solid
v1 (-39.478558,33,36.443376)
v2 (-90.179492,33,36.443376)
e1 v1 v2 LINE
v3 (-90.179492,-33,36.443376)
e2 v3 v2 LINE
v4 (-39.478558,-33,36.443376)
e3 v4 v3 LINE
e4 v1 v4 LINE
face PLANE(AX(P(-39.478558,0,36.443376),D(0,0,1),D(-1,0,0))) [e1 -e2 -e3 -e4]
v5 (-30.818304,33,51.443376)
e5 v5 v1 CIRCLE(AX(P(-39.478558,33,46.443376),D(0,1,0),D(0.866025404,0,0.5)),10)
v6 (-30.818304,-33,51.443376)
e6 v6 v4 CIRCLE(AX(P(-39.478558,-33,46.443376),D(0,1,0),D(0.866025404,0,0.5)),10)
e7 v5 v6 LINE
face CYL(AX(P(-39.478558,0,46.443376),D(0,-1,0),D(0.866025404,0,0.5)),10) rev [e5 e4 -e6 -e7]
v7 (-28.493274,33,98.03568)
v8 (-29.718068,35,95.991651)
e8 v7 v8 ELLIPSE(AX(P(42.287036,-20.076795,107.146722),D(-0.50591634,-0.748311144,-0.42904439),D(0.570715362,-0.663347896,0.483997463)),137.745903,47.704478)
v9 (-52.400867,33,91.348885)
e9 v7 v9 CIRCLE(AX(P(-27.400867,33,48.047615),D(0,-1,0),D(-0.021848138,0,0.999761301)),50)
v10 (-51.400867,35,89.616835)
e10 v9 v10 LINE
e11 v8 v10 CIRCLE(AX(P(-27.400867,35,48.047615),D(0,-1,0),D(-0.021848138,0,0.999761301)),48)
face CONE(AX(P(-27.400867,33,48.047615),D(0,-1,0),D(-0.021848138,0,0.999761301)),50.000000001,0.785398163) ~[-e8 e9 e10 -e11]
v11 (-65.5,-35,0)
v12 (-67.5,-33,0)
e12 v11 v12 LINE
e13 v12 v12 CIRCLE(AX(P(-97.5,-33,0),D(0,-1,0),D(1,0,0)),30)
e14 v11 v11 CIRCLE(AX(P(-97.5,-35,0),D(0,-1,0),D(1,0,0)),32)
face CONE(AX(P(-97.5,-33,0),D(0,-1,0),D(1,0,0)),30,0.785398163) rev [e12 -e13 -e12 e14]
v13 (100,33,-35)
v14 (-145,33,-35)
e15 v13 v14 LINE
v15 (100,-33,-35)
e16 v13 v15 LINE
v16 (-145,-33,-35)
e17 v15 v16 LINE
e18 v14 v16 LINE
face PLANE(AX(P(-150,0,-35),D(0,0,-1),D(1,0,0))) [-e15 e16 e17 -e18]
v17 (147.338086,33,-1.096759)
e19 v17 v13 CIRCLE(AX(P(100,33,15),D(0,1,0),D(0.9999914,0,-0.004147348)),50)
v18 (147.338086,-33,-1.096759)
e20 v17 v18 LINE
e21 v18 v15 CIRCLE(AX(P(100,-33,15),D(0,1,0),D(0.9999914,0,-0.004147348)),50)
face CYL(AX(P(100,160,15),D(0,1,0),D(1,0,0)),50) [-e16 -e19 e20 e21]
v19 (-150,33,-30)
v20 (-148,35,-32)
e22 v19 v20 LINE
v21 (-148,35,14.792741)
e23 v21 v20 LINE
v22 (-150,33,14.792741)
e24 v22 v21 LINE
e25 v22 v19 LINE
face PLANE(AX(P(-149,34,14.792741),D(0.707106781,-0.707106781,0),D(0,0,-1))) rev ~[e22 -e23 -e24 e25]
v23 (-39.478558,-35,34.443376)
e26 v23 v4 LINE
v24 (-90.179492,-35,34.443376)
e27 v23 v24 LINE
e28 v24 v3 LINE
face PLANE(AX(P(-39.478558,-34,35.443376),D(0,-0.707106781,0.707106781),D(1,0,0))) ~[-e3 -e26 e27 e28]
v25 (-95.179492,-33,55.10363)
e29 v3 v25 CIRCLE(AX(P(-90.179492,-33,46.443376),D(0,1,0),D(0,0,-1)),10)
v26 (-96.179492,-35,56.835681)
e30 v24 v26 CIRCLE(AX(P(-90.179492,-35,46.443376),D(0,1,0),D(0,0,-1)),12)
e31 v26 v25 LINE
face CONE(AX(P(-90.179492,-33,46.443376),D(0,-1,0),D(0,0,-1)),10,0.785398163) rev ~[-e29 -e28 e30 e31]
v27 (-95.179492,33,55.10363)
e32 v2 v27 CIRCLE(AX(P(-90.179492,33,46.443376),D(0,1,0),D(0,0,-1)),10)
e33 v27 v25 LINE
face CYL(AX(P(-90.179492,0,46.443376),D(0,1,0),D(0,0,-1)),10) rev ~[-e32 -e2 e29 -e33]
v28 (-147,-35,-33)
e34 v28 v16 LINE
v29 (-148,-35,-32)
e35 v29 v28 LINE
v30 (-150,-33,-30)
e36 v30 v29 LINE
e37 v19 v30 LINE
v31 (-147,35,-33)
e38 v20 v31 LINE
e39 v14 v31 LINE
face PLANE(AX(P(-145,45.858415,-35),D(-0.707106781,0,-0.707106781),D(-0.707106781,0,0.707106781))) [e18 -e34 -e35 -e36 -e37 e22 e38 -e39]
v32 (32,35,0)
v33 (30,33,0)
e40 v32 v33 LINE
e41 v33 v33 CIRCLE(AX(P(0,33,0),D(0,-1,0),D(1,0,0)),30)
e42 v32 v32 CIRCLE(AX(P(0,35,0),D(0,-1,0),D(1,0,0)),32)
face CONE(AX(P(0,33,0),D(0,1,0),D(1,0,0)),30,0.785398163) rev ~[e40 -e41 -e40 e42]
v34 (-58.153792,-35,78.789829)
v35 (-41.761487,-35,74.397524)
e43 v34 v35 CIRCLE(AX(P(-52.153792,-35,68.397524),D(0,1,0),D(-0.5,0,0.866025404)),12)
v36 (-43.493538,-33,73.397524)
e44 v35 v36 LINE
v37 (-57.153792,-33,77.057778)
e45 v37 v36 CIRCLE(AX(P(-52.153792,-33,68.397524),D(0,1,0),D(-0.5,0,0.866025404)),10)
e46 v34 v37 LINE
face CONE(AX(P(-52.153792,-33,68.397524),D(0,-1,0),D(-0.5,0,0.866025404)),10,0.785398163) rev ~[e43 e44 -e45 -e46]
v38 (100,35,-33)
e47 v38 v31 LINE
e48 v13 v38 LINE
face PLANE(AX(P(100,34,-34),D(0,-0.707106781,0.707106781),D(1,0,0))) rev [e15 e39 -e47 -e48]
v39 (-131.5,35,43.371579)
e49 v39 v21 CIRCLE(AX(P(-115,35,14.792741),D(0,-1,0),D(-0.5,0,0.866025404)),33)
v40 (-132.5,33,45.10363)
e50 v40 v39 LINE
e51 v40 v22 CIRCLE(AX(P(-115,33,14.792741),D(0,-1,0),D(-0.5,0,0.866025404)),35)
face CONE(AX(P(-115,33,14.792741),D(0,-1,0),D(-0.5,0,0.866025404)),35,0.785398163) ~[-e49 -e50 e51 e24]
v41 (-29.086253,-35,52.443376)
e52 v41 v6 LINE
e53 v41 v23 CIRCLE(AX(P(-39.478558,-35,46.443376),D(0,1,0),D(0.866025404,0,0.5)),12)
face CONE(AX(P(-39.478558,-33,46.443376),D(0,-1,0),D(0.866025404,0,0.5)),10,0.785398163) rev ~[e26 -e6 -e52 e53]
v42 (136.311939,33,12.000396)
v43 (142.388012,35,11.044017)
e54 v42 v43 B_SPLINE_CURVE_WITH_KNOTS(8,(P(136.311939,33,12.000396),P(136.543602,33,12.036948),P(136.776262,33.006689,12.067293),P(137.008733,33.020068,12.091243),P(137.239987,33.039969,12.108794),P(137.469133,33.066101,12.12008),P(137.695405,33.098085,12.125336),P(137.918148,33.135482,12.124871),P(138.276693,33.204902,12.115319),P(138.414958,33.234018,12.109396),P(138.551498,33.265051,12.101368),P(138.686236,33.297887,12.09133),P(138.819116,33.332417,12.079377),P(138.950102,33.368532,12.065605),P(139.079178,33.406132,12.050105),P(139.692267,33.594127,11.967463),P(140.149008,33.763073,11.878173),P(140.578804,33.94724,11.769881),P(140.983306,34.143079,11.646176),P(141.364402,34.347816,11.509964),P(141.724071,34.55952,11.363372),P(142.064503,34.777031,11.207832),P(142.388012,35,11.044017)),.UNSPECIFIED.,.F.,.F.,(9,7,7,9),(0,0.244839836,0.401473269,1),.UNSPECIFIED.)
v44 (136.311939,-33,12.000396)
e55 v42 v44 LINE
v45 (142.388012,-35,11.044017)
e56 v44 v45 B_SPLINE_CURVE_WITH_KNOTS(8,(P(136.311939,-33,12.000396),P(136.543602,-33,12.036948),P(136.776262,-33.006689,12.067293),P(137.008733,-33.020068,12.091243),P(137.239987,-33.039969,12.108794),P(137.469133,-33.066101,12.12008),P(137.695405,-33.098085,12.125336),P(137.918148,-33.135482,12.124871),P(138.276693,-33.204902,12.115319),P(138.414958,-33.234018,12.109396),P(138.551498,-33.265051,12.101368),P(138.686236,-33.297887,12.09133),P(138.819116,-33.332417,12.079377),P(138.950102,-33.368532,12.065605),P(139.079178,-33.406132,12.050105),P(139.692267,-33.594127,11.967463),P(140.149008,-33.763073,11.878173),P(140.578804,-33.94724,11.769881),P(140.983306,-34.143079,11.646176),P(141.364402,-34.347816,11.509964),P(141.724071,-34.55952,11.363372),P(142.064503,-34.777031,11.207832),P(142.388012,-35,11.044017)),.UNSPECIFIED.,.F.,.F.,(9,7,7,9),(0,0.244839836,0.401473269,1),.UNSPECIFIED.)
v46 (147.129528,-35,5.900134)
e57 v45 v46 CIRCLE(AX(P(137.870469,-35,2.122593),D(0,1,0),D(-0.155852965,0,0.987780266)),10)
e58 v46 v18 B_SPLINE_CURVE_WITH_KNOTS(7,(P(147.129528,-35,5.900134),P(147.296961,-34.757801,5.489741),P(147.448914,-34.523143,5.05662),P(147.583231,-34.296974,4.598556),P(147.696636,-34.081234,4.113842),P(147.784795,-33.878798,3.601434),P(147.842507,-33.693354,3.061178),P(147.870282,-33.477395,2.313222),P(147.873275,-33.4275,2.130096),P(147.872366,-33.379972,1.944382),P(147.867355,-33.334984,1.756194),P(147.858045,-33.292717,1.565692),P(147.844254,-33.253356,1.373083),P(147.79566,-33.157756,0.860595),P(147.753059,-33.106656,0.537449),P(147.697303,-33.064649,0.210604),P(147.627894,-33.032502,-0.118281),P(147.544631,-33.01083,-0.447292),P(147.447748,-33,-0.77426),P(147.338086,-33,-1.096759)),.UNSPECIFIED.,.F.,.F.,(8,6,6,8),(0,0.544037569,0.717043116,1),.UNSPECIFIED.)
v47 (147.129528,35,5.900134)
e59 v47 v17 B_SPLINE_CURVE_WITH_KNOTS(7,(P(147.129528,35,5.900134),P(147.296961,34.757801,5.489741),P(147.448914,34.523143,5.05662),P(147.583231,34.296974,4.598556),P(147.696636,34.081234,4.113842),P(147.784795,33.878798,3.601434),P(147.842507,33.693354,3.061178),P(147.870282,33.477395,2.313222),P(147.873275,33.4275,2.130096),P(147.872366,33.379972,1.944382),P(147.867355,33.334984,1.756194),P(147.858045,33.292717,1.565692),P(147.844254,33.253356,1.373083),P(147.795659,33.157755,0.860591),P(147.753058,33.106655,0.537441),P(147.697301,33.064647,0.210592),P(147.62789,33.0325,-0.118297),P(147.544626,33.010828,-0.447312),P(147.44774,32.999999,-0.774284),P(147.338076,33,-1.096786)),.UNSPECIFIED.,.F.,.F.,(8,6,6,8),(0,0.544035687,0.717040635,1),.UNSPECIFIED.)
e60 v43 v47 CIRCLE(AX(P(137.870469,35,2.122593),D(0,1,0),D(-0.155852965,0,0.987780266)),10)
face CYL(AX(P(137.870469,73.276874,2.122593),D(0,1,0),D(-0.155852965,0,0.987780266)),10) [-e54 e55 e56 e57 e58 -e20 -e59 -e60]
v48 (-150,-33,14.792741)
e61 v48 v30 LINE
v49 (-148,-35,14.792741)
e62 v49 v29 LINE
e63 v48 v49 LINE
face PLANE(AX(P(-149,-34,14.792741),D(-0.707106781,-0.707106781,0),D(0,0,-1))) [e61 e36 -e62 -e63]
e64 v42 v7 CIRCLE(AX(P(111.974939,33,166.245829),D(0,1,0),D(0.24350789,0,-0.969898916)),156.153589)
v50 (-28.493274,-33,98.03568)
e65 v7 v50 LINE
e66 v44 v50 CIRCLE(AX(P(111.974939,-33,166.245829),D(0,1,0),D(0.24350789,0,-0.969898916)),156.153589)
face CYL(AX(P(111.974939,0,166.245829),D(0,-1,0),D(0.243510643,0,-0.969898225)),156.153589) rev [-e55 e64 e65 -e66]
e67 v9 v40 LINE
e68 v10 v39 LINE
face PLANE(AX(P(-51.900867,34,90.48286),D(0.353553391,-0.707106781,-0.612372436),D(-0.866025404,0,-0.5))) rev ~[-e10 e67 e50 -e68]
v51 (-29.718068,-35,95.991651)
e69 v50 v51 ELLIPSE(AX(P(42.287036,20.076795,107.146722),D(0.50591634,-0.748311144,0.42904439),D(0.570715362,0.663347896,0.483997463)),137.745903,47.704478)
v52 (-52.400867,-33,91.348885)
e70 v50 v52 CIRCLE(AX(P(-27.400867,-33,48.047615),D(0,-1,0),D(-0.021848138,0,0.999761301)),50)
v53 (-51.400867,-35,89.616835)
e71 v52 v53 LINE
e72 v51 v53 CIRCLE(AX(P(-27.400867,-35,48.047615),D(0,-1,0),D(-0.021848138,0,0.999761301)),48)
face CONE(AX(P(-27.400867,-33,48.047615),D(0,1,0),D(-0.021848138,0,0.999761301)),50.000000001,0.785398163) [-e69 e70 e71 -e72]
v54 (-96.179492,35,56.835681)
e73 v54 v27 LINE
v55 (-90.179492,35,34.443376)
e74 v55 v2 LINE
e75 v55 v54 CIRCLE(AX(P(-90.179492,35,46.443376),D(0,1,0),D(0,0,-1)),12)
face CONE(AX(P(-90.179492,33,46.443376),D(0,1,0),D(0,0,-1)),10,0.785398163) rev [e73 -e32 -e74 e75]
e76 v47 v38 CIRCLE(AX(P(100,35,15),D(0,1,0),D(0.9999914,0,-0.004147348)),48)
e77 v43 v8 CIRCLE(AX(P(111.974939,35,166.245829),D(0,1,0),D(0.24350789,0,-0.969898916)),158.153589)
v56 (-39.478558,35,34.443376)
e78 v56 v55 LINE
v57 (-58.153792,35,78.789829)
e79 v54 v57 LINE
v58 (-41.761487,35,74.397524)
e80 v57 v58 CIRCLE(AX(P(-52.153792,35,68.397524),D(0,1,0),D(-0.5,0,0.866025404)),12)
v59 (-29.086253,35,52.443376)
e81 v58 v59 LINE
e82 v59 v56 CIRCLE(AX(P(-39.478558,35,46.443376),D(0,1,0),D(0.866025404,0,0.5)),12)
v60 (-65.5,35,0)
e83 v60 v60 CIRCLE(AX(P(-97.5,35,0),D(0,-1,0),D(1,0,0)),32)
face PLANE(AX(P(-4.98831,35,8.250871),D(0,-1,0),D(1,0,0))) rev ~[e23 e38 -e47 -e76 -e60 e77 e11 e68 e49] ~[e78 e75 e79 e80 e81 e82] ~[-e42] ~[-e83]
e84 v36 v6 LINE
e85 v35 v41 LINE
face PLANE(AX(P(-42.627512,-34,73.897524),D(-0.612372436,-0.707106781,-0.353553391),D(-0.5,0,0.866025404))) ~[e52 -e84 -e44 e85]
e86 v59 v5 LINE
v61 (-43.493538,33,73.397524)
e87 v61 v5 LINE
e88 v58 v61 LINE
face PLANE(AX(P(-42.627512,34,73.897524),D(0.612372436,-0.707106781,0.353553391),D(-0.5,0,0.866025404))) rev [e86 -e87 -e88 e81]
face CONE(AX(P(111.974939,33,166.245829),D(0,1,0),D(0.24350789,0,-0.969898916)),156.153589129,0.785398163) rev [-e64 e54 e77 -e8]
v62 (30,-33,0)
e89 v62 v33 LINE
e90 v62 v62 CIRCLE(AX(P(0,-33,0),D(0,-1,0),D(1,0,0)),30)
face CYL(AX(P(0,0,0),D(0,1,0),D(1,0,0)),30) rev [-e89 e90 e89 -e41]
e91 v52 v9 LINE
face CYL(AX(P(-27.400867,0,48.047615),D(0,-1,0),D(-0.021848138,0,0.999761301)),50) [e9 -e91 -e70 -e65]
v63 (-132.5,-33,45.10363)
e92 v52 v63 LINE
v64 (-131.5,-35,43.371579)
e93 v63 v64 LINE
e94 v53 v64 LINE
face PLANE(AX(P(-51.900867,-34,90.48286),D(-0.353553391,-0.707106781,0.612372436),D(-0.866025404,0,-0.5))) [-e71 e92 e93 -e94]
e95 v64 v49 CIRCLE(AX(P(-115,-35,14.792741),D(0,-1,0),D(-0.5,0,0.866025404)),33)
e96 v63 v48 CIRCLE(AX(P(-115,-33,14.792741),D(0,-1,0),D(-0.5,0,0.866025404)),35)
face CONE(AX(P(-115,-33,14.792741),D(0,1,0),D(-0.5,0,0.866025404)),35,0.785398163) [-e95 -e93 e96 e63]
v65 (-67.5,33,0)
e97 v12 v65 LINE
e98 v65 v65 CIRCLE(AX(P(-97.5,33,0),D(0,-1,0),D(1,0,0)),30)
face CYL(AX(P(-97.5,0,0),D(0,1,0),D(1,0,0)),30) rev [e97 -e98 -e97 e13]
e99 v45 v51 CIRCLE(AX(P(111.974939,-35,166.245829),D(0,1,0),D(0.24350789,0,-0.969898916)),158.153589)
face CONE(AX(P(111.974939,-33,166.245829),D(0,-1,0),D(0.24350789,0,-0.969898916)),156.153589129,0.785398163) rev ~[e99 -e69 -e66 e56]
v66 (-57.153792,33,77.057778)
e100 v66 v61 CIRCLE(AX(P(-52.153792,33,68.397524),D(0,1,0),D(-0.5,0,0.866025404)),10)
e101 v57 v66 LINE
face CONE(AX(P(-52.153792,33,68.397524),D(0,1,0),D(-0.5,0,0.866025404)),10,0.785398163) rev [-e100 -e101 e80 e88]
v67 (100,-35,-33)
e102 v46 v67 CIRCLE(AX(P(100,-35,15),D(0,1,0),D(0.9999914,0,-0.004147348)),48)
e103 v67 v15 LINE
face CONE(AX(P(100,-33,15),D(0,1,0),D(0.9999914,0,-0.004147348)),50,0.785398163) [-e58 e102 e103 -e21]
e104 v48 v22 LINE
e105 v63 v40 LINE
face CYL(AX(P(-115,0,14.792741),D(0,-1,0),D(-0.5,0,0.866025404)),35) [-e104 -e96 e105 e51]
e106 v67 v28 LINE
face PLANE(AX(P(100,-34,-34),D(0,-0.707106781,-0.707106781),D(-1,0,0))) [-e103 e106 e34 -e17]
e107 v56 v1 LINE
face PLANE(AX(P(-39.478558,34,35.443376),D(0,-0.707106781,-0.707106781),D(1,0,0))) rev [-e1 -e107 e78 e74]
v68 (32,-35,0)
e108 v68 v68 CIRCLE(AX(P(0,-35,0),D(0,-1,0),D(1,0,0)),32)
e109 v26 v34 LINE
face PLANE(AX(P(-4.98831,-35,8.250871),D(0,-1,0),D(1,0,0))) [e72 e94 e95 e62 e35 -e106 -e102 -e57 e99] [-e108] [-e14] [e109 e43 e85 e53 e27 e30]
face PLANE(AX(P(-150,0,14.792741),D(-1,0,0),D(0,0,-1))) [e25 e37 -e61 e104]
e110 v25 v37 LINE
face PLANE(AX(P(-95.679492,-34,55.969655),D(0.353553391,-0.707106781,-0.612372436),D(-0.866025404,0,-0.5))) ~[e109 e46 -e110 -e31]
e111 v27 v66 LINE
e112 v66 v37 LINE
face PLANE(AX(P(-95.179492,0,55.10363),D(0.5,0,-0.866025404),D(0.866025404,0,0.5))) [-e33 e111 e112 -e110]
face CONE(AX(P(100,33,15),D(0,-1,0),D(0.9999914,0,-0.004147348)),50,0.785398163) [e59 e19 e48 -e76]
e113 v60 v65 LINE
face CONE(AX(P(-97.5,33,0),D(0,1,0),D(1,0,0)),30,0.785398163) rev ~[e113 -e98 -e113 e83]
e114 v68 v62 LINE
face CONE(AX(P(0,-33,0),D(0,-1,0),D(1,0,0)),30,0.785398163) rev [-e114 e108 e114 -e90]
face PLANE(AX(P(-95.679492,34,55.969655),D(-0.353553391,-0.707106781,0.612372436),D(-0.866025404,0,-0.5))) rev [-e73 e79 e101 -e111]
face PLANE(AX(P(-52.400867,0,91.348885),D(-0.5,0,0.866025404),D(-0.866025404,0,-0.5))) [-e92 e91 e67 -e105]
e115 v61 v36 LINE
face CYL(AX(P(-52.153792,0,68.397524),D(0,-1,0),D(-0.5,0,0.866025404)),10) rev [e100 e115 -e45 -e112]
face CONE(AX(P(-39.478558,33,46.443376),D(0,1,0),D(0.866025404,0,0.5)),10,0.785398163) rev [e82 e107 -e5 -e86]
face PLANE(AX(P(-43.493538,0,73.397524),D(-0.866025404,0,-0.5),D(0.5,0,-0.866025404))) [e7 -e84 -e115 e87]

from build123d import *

# Parameters (mm, degrees)
F0_R        = 30
F1_DEPTH    = 35
F2_T1_DEPTH = 320
F3_SIZE     = 2
F4_T1_DEPTH = 91.7168298797
F5_T1_DEPTH = 146.5537481792


# Not quite as in the source:
# - a fillet or chamfer that OpenCascade refuses, or shapes differently, is made with other operations: its cross-section is extruded or revolved along the edge and cut away or added


with BuildPart() as f1:
    # F0 (on Front) → F1 (new body, symmetric)
    with BuildSketch(Plane.XZ):
        with BuildLine():
            Line((-150, -35), (150, -35))
            Line((150, -35), (150, 14.7927405784))
            ThreePointArc((150, 14.7927405784), (45.9749646372, 24.7257009589), (-28.4932742745, 98.0356803447))
            ThreePointArc((-28.4932742745, 98.0356803447), (-40.8686708706, 96.1996481654), (-52.4008673876, 91.3488854864))
            Line((-52.4008673876, 91.3488854864), (-132.5, 45.1036297108))
            ThreePointArc((-132.5, 45.1036297108), (-145.3108891325, 32.2927405784), (-150, 14.7927405784))
            Line((-150, 14.7927405784), (-150, -35))
        make_face()
        with Locations((-97.5, 0)):
            Circle(F0_R, mode=Mode.SUBTRACT)
        Circle(F0_R, mode=Mode.SUBTRACT)
        with BuildLine():
            ThreePointArc((-90.1794919243, 36.443375673), (-99.8387501872, 43.8551852219), (-95.1794919243, 55.1036297108))
            Line((-95.1794919243, 55.1036297108), (-57.1537916494, 77.0577780006))
            ThreePointArc((-57.1537916494, 77.0577780006), (-49.5656011984, 78.0567822257), (-43.4935376116, 73.3975239628))
            Line((-43.4935376116, 73.3975239628), (-30.8183041866, 51.443375673))
            ThreePointArc((-30.8183041866, 51.443375673), (-30.8183041866, 41.443375673), (-39.4785582245, 36.443375673))
            Line((-39.4785582245, 36.443375673), (-90.1794919243, 36.443375673))
        make_face(mode=Mode.SUBTRACT)
    extrude(amount=F1_DEPTH, both=True)

    # F2: fillet of radius 50 on 1 edges, made by hand

    # F2_s2 → F2_t1 (cut)
    with BuildSketch(Plane.XZ.offset(-160)):
        with BuildLine():
            ThreePointArc((150, 15), (135.3553390593, -20.3553390593), (100, -35))
            Line((100, -35), (150, -35))
            Line((150, -35), (150, 15))
        make_face()
    extrude(amount=F2_T1_DEPTH, mode=Mode.SUBTRACT)

    # F3
    f3_edges = [f1.edges().sort_by_distance(p)[0] for p in [
        (135.281947, -35, -20.428579),
        (-25, -35, -35),
        (-150, -35, -10.10363),
        (-145.310889, -35, 32.292741),
        (-92.450434, -35, 68.226258),
        (-40.868671, -35, 96.199648),
        (45.974764, -35, 24.725795),
        (-127.5, -35, 0),
        (-30, -35, 0),
        (-99.83875, -35, 43.855185),
        (-64.829025, -35, 36.443376),
        (-76.166642, -35, 66.080704),
        (-30.818304, -35, 41.443376),
        (-49.565601, -35, 78.056782),
        (-37.155921, -35, 62.42045),
        (135.281947, 35, -20.428579),
        (-25, 35, -35),
        (-150, 35, -10.10363),
        (-145.310889, 35, 32.292741),
        (-92.450434, 35, 68.226258),
        (-40.868671, 35, 96.199648),
        (45.974764, 35, 24.725795),
        (-127.5, 35, 0),
        (-30, 35, 0),
        (-99.83875, 35, 43.855185),
        (-64.829025, 35, 36.443376),
        (-76.166642, 35, 66.080704),
        (-30.818304, 35, 41.443376),
        (-49.565601, 35, 78.056782),
        (-37.155921, 35, 62.42045),
    ]]
    chamfer(f3_edges, length=F3_SIZE)

    # F4: chamfer of 5 on 1 edges, made by hand

    # F4_s2 → F4_t1 (cut)
    with BuildSketch(Plane.XZ.offset(-45.8584149398)):
        Polygon((-145, -35), (-150, -30), (-150, -35), align=None)
    extrude(amount=F4_T1_DEPTH, mode=Mode.SUBTRACT)

    # F5: fillet of radius 10 on 1 edges, made by hand

    # F5_s2 → F5_t1 (cut)
    with BuildSketch(Plane.XZ.offset(-73.2768740896)):
        with BuildLine():
            ThreePointArc((136.3119389308, 12.0003957225), (145.5204541724, 8.5629129702), (147.338085728, -1.0967586678))
            ThreePointArc((147.338085728, -1.0967586678), (149.3130103908, 6.7400359449), (149.9995699858, 14.7926326161))
            ThreePointArc((149.9995699858, 14.7926326161), (143.1869943531, 13.243375245), (136.3119389308, 12.0003957225))
        make_face()
    extrude(amount=F5_T1_DEPTH, mode=Mode.SUBTRACT)


solid = f1.part
